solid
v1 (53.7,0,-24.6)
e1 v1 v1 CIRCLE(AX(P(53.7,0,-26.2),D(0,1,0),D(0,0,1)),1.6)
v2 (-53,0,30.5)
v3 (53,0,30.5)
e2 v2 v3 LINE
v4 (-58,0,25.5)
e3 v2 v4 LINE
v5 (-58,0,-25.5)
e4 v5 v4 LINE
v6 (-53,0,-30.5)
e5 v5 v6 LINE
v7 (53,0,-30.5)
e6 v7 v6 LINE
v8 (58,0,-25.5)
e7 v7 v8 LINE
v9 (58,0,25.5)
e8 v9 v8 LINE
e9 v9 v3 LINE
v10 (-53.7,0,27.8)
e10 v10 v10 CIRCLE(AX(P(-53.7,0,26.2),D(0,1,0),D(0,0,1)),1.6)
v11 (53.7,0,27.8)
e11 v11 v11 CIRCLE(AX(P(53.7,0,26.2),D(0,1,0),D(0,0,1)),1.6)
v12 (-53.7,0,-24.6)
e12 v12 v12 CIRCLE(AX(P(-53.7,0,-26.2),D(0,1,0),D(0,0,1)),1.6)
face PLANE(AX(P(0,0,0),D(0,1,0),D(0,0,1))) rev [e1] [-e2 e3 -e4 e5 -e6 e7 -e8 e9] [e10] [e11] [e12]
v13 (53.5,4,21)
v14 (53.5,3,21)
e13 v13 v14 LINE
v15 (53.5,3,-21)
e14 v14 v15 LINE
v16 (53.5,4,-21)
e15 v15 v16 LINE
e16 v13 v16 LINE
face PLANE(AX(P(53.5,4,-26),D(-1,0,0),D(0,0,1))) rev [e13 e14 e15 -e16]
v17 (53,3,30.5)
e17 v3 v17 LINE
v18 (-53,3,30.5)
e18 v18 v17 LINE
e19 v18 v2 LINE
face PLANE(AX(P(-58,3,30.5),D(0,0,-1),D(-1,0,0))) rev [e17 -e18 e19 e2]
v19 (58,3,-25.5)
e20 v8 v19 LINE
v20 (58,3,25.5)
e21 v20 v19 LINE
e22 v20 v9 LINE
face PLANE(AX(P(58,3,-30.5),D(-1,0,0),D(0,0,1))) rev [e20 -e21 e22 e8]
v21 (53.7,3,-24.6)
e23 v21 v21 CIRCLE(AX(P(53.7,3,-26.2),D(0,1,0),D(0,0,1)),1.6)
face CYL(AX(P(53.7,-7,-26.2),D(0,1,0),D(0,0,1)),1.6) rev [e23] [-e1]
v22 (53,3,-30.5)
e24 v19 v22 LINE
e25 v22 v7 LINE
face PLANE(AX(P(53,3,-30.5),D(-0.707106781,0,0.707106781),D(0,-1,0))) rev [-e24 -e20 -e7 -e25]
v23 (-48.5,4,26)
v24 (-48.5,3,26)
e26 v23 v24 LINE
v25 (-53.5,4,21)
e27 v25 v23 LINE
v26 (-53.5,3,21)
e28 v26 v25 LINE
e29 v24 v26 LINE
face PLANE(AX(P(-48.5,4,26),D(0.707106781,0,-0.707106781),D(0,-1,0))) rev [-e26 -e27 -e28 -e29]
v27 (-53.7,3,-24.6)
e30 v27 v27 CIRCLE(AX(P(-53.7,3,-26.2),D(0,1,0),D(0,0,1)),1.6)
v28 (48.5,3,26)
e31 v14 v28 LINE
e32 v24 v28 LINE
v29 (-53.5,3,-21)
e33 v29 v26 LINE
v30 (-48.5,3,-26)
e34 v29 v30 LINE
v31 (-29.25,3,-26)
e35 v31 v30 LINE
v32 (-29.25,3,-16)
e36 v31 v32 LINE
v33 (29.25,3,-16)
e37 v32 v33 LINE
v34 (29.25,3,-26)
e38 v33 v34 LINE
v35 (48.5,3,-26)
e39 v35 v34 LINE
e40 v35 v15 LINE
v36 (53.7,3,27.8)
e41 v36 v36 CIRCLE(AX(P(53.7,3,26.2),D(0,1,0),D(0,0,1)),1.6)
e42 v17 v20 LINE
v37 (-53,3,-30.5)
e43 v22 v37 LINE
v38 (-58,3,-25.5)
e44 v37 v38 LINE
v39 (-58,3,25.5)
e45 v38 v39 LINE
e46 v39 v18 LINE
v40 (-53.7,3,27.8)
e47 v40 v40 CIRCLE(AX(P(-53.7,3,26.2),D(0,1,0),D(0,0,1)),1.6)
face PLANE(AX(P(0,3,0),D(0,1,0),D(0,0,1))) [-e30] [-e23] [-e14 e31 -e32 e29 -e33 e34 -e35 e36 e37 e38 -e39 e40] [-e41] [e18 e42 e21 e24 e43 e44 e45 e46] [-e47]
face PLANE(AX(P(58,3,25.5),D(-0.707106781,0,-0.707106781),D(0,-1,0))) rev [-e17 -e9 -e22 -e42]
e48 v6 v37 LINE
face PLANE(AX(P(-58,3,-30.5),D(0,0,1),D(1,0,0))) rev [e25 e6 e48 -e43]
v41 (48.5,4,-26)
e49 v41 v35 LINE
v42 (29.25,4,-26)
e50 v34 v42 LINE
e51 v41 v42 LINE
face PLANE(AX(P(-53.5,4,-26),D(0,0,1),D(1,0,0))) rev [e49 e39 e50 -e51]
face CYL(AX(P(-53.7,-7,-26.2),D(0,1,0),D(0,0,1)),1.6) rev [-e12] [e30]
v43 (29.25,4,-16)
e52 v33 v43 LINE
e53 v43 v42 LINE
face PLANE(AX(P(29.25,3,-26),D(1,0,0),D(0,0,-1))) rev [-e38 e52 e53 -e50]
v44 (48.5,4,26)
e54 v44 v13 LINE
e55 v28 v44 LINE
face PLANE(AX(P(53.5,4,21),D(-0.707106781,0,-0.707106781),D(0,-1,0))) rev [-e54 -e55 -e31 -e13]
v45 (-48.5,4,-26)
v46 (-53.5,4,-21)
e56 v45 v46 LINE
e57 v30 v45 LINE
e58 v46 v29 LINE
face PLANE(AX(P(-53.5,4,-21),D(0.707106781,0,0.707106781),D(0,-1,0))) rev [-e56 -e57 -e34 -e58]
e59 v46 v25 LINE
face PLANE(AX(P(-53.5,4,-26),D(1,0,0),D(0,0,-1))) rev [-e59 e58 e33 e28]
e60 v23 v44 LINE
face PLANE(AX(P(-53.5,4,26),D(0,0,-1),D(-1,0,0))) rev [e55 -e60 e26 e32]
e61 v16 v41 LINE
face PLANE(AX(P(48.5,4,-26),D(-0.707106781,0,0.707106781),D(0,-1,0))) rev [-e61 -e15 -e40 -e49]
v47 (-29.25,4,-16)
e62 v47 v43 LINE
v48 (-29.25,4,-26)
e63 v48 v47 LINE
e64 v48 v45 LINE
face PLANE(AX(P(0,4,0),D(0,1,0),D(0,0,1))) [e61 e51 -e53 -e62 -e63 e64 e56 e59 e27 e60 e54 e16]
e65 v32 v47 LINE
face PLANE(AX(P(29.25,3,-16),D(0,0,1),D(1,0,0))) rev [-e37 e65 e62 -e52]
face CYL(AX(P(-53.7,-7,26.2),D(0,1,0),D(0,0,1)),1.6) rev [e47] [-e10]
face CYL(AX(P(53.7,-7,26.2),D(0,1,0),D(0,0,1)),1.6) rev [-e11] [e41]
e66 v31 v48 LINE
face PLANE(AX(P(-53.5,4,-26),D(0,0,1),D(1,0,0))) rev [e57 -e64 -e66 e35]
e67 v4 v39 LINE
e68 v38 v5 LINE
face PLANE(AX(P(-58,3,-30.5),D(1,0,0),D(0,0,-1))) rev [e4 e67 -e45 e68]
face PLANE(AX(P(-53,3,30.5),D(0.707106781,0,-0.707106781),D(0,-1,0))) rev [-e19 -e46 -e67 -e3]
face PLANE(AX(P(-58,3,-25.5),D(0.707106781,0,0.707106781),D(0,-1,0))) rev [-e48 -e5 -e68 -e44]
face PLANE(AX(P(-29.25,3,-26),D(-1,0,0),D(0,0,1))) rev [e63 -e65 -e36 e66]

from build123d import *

# Parameters (mm, degrees)
SKETCH1_W           = 116
SKETCH1_H           = 61
BOSS_EXTRUDE1_DEPTH = 3
CHAMFER1_SIZE       = 5
SKETCH2_R           = 1.6
CUT_EXTRUDE1_DEPTH  = 10
SKETCH3_W           = 107
SKETCH3_H           = 52
BOSS_EXTRUDE2_DEPTH = 1
CHAMFER2_SIZE       = 5
SKETCH4_W           = 58.5
SKETCH4_H           = 10
CUT_EXTRUDE2_DEPTH  = 1


with BuildPart() as part:
    # Sketch1 → Boss-Extrude1 (new body)
    with BuildSketch(Plane(origin=(0, 0, 0), x_dir=(1, 0, 0), z_dir=(0, 1, 0))):
        Rectangle(SKETCH1_W, SKETCH1_H)
    extrude(amount=BOSS_EXTRUDE1_DEPTH)

    # Chamfer1
    chamfer1_edges = [part.edges().sort_by_distance(p)[0] for p in [
        (58, 1.5, 30.5),
        (-58, 1.5, 30.5),
        (-58, 1.5, -30.5),
        (58, 1.5, -30.5),
    ]]
    chamfer(chamfer1_edges, length=CHAMFER1_SIZE)

    # Sketch2 → Cut-Extrude1 (cut)
    with BuildSketch(Plane(origin=(0, 3, 0), x_dir=(1, 0, 0), z_dir=(0, 1, 0))):
        with Locations(Location((-53.7, 26.2, 0), (0, 0, 270))):
            Circle(SKETCH2_R)
        with Locations(Location((53.7, 26.2, 0), (0, 0, 270))):
            Circle(SKETCH2_R)
        with Locations(Location((53.7, -26.2, 0), (0, 0, 270))):
            Circle(SKETCH2_R)
        with Locations(Location((-53.7, -26.2, 0), (0, 0, 270))):
            Circle(SKETCH2_R)
    extrude(amount=-CUT_EXTRUDE1_DEPTH, mode=Mode.SUBTRACT)

    # Sketch3 → Boss-Extrude2 (add)
    with BuildSketch(Plane(origin=(0, 3, 0), x_dir=(1, 0, 0), z_dir=(0, 1, 0))):
        Rectangle(SKETCH3_W, SKETCH3_H)
    extrude(amount=BOSS_EXTRUDE2_DEPTH)

    # Chamfer2
    # the kernel refuses this chamfer: 5 mm, written as the material it takes off along each edge
    with BuildSketch(Plane(origin=(53.5, 3, 26), x_dir=(-0.9996219169112968, 0, 0.027495876610586317), z_dir=(0, 1, 0))) as chamfer2_piece_1:
        Polygon((CHAMFER2_SIZE * 0.999621916911, -CHAMFER2_SIZE * 0.0274958766106), (-CHAMFER2_SIZE * 0.0274958766106, -CHAMFER2_SIZE * 0.999621916911), (0, 0), align=None)
    extrude(amount=13.85841494, mode=Mode.SUBTRACT)
    with BuildSketch(Plane(origin=(53.5, 3, -26), x_dir=(-0.9996219169112968, 0, -0.027495876610586282), z_dir=(0, 1, 0)), Plane(origin=(-53.5, 3, -26), x_dir=(-0.027495876610586317, 0, 0.9996219169112968), z_dir=(0, 1, 0)), Plane(origin=(-53.5, 3, 26), x_dir=(0.9996219169112968, 0, 0.027495876610586282), z_dir=(0, 1, 0))) as chamfer2_piece_2:
        Polygon((CHAMFER2_SIZE * 0.999621916911, CHAMFER2_SIZE * 0.0274958766106), (-CHAMFER2_SIZE * 0.0274958766106, CHAMFER2_SIZE * 0.999621916911), (0, 0), align=None)
    extrude(amount=13.85841494, mode=Mode.SUBTRACT)

    # Sketch4 → Cut-Extrude2 (cut)
    with BuildSketch(Plane(origin=(0, 4, 0), x_dir=(1, 0, 0), z_dir=(0, 1, 0))):
        with Locations((0, 21)):
            Rectangle(SKETCH4_W, SKETCH4_H)
    extrude(amount=-CUT_EXTRUDE2_DEPTH, mode=Mode.SUBTRACT)


solid = part.part
